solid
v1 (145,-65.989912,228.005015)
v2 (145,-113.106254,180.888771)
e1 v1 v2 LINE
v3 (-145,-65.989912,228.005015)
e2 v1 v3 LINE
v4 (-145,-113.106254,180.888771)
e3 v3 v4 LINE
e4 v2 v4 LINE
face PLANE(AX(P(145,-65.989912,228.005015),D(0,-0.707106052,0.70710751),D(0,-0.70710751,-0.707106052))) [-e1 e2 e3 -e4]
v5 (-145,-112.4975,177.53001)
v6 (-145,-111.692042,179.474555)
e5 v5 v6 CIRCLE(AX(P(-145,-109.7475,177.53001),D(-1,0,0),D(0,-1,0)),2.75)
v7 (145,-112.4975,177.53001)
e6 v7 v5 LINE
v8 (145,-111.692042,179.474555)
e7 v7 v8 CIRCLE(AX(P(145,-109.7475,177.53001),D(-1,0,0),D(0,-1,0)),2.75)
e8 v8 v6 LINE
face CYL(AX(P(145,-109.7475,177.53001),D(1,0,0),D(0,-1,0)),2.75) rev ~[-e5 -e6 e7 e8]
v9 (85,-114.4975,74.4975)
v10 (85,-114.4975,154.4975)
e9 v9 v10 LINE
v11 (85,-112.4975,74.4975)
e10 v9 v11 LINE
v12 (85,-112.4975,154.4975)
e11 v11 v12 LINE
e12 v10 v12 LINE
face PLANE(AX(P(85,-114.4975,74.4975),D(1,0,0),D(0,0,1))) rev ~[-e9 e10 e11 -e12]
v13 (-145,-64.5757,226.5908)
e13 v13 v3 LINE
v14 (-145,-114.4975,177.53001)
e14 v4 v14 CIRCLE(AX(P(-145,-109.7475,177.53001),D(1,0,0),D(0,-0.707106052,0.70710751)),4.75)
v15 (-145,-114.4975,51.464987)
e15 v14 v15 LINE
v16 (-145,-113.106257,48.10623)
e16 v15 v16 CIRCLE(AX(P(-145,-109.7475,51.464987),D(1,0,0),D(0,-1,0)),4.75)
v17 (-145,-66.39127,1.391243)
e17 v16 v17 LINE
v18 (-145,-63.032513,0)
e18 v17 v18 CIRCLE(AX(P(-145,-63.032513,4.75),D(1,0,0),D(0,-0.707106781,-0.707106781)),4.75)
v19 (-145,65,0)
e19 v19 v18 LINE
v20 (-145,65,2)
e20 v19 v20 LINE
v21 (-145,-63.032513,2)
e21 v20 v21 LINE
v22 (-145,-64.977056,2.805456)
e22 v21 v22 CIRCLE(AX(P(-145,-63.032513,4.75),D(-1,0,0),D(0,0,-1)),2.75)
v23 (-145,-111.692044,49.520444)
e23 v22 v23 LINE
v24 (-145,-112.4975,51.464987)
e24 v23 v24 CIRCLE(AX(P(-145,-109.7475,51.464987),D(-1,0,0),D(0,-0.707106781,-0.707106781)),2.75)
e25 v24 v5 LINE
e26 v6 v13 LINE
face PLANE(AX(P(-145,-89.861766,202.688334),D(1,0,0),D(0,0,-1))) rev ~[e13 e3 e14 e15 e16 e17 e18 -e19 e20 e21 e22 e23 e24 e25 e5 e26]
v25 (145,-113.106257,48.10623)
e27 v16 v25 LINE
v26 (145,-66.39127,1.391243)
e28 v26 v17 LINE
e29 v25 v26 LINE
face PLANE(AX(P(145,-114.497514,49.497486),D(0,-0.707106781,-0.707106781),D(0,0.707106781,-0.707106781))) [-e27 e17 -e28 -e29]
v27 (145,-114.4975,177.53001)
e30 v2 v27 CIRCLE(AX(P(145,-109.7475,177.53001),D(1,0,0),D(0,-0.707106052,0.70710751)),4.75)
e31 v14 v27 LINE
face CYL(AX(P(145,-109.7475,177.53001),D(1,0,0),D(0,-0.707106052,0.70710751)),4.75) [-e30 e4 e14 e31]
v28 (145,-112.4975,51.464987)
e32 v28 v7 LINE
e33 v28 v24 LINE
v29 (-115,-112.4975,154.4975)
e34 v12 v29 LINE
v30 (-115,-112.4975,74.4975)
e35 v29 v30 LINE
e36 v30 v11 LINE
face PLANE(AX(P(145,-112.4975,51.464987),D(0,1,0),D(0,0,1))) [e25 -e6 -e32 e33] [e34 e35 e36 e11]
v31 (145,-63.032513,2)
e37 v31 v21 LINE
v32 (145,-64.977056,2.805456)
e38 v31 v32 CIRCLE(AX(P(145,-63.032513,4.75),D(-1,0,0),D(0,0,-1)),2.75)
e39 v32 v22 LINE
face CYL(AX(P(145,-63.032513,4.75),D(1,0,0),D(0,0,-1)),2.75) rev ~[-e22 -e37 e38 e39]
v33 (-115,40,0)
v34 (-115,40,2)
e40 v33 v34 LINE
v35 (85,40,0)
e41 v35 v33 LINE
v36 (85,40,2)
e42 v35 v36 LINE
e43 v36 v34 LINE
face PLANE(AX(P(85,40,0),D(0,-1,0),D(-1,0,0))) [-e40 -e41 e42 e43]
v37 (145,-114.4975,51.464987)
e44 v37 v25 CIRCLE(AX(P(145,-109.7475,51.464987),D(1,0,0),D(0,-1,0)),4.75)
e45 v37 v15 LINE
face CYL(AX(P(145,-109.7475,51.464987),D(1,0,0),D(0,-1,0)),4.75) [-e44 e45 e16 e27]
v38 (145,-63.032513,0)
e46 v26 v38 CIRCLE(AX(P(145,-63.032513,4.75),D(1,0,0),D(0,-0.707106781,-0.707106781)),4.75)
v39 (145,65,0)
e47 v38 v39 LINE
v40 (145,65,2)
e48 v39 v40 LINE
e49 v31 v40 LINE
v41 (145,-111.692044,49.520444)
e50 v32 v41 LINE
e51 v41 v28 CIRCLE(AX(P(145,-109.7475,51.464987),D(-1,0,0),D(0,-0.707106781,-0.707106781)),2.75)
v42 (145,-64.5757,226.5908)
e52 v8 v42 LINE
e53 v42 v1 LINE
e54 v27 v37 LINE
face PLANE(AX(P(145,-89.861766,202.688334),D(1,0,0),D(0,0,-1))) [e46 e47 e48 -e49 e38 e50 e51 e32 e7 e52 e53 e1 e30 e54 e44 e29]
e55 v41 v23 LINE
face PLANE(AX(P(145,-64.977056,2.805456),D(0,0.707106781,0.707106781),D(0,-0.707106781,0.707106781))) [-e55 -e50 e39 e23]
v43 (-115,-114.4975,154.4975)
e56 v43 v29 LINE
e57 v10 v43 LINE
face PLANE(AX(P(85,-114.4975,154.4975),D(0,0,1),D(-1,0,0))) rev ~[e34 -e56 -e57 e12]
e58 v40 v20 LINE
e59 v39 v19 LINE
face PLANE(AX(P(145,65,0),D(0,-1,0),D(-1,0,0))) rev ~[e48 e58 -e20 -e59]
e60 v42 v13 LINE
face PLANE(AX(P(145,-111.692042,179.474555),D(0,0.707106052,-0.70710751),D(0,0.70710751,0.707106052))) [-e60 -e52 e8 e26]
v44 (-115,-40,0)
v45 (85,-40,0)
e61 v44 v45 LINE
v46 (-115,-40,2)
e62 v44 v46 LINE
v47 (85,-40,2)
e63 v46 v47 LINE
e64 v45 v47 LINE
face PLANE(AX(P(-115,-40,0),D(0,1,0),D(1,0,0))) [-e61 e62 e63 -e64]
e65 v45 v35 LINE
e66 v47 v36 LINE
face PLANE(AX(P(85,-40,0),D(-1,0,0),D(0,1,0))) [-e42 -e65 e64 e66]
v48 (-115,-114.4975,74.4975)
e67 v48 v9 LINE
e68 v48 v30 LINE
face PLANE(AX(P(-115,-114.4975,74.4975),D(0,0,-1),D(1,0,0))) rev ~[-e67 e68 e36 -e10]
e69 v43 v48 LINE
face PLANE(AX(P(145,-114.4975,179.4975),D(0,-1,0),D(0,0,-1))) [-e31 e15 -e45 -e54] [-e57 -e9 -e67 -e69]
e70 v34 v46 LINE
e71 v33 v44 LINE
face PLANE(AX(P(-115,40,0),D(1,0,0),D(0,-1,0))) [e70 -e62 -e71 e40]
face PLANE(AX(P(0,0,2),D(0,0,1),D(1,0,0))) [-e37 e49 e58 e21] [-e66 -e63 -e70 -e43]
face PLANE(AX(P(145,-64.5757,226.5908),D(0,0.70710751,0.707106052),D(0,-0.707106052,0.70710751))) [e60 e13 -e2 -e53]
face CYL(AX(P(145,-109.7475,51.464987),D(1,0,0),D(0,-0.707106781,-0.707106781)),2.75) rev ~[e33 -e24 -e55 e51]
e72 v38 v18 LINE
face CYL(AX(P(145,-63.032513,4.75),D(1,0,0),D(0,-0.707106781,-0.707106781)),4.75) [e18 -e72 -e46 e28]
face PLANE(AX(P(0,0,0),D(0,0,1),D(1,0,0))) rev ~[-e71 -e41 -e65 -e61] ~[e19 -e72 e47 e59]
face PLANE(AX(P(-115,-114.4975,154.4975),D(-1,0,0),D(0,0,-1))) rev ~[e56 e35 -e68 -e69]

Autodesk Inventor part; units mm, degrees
ref_plane "YZ Plane" through (0, 0, 0) normal (1, 0, 0) x (0, 1, 0)
ref_plane "XZ Plane" through (0, 0, 0) normal (0, 1, 0) x (-1, 0, 0)
ref_plane "XY Plane" through (0, 0, 0) normal (0, 0, 1) x (1, 0, 0)
sketch "Sketch1" plane through (0, 0, 0) normal (0, 0, 1) x (1, 0, 0)
  line L0 (145, 65) -> (-145, 65)
  line L1 (-145, 65) -> (-145, -65)
  line L2 (-145, -65) -> (145, -65)
  line L3 (145, -65) -> (145, 65)
  line L4 (145, 65) -> (-145, -65) construction
  line L5 (-145, 65) -> (145, -65) construction
  line L6 (85, 40) -> (-115, 40)
  line L7 (-115, 40) -> (-115, -40)
  line L8 (-115, -40) -> (85, -40)
  line L9 (85, -40) -> (85, 40)
  line L10 (85, 40) -> (-115, -40) construction
  line L11 (-115, 40) -> (85, -40) construction
  point P0 (0, 0)
  point P1 (0, 0)
  point P2 (-15, 0)
  point P3 (85, 0)
  point P4 (145, 0)
  dimension "d34" = 200
  dimension "d35" = 80
  dimension "d51" = 60
  dimension "d53" = 30
  dimension "d54" = 25
  dimension "d56" = 130
extrude "Plate1" add sketch "Sketch1" along normal blind 2
sketch "Sketch6" plane through (145, -63.5858, 1.4142) normal (0, -0.7071068, -0.7071068) x (1, 0, 0)
  line L0 (-290, 0) -> (0, 0)
  line L1 (0, 0) -> (0, 70)
  line L2 (0, 70) -> (-290, 70)
  line L3 (-290, 70) -> (-290, 0)
edge flange "Flange2" height 70 angle 45 thickness 2 bend radius 2.75 thickness toward (0, -0.7071068, -0.7071068) relief round relief width 2 relief depth 1 edges at (0, -65, 2) wall of the first edge with corners at (-145, -63.5858, 1.4142) (145, -63.5858, 1.4142) (145, -113.0833, 50.9117) (-145, -113.0833, 50.9117)
bend "Bend2"
corner "Corner2"
sketch "Sketch8" plane through (145, -112.4975, 49.4975) normal (0, -1, 0) x (1, 0, 0)
  line L0 (-290, 0) -> (0, 0)
  line L1 (0, 0) -> (0, 130)
  line L2 (0, 130) -> (-290, 130)
  line L3 (-290, 130) -> (-290, 0)
edge flange "Flange3" height 130 angle 45 thickness 2 bend radius 2.75 thickness toward (0, -1, 0) relief round relief width 2 relief depth 1 edges at (0, -113.0833, 50.9117) wall of the first edge with corners at (-145, -112.4975, 49.4975) (145, -112.4975, 49.4975) (145, -112.4975, 179.4975) (-145, -112.4975, 179.4975)
bend "Bend3"
corner "Corner3"
sketch "Sketch9" plane through (145, -113.0833, 178.0833) normal (0, -0.7071068, 0.7071068) x (1, 0, 0)
  line L0 (-290, 0) -> (0, 0)
  line L1 (0, 0) -> (0, 68.6)
  line L2 (0, 68.6) -> (-290, 68.6)
  line L3 (-290, 68.6) -> (-290, 0)
edge flange "Flange4" height 68.6 angle 45 thickness 2 bend radius 2.75 thickness toward (0, -0.7071068, 0.7071068) relief round relief width 2 relief depth 1 edges at (0, -112.4975, 179.4975) wall of the first edge with corners at (-145, -113.0833, 178.0833) (145, -113.0833, 178.0833) (145, -64.5757, 226.5908) (-145, -64.5757, 226.5908)
bend "Bend4"
corner "Corner4"
sketch "Sketch10" plane through (-145, -114.4975, 51.465) normal (0, -1, 0) x (1, 0, 0)
  line L0 (290, 126.065) -> (0, 126.065) projected
  line L1 (0, 0) -> (0, 126.065) projected
  line L2 (0, 0) -> (290, 0) projected
  line L3 (290, 126.065) -> (290, 0) projected
  line L4 (30, 23.0325) -> (230, 23.0325)
  line L5 (230, 23.0325) -> (230, 103.0325)
  line L6 (230, 103.0325) -> (30, 103.0325)
  line L7 (30, 103.0325) -> (30, 23.0325)
  point P0 (145, -51.465)
  point P1 (30, 63.0325)
  point P2 (0, 63.0325)
  dimension "d77" = 80
  dimension "d78" = 200
  dimension "d79" = 30
extrude "Cut3" cut sketch "Sketch10" against normal blind 2 contours L7 L6 L5 L4
equation "\"d34\" = MAIN_6_central_window_hight"
equation "\"d35\" = MAIN_7_central_window_width"
equation "\"d56\" = Wall_1_width"
equation "\"d77\" = MAIN_7_central_window_width"
equation "\"d78\" = MAIN_6_central_window_hight"
equation "\"d79\" = d53"
equation "\"d80\" = Thickness"
equation "\"d2\" = Thickness"
equation "\"d36\" = BendReliefWidth"
equation "\"d37\" = BendReliefDepth"
equation "\"d38\" = MinimumRemnant"
equation "\"d39\" = TransitionRadius"
equation "\"d40\" = Wall_2_width"
equation "\"d42\" = BendRadius"
equation "\"d43\" = CornerReliefSize"
equation "\"d44\" = GapSize"
equation "\"d45\" = JacobiRadiusSize"
equation "\"d57\" = BendReliefWidth"
equation "\"d58\" = BendReliefDepth"
equation "\"d59\" = MinimumRemnant"
equation "\"d60\" = TransitionRadius"
equation "\"d61\" = d56"
equation "\"d63\" = BendRadius"
equation "\"d64\" = CornerReliefSize"
equation "\"d65\" = GapSize"
equation "\"d66\" = JacobiRadiusSize"
equation "\"d67\" = BendReliefWidth"
equation "\"d68\" = BendReliefDepth"
equation "\"d69\" = MinimumRemnant"
equation "\"d70\" = TransitionRadius"
equation "\"d71\" = Wall_2_width - 0.7 * Thickness"
equation "\"d73\" = BendRadius"
equation "\"d74\" = CornerReliefSize"
equation "\"d75\" = GapSize"
equation "\"d76\" = JacobiRadiusSize"
equation "\"BendReliefWidth\" = Thickness"
equation "\"BendReliefDepth\" = 0.5 * Thickness"
equation "\"CornerReliefSize\" = 4 * Thickness"
equation "\"MinimumRemnant\" = 2 * Thickness"
equation "\"TransitionRadius\" = BendRadius"
equation "\"JacobiRadiusSize\" = BendRadius"
equation "\"GapSize\" = Thickness"
equation "\"MAIN_6_central_window_hight\" = 200"
equation "\"MAIN_7_central_window_width\" = 80"
equation "\"Wall_1_width\" = 130"
equation "\"Thickness\" = 2"
equation "\"Wall_2_width\" = 70"
equation "\"BendRadius\" = 2.75"
properties part number "TKS 3554 BOTTOM DS box wall 1" material "Stainless Steel"
